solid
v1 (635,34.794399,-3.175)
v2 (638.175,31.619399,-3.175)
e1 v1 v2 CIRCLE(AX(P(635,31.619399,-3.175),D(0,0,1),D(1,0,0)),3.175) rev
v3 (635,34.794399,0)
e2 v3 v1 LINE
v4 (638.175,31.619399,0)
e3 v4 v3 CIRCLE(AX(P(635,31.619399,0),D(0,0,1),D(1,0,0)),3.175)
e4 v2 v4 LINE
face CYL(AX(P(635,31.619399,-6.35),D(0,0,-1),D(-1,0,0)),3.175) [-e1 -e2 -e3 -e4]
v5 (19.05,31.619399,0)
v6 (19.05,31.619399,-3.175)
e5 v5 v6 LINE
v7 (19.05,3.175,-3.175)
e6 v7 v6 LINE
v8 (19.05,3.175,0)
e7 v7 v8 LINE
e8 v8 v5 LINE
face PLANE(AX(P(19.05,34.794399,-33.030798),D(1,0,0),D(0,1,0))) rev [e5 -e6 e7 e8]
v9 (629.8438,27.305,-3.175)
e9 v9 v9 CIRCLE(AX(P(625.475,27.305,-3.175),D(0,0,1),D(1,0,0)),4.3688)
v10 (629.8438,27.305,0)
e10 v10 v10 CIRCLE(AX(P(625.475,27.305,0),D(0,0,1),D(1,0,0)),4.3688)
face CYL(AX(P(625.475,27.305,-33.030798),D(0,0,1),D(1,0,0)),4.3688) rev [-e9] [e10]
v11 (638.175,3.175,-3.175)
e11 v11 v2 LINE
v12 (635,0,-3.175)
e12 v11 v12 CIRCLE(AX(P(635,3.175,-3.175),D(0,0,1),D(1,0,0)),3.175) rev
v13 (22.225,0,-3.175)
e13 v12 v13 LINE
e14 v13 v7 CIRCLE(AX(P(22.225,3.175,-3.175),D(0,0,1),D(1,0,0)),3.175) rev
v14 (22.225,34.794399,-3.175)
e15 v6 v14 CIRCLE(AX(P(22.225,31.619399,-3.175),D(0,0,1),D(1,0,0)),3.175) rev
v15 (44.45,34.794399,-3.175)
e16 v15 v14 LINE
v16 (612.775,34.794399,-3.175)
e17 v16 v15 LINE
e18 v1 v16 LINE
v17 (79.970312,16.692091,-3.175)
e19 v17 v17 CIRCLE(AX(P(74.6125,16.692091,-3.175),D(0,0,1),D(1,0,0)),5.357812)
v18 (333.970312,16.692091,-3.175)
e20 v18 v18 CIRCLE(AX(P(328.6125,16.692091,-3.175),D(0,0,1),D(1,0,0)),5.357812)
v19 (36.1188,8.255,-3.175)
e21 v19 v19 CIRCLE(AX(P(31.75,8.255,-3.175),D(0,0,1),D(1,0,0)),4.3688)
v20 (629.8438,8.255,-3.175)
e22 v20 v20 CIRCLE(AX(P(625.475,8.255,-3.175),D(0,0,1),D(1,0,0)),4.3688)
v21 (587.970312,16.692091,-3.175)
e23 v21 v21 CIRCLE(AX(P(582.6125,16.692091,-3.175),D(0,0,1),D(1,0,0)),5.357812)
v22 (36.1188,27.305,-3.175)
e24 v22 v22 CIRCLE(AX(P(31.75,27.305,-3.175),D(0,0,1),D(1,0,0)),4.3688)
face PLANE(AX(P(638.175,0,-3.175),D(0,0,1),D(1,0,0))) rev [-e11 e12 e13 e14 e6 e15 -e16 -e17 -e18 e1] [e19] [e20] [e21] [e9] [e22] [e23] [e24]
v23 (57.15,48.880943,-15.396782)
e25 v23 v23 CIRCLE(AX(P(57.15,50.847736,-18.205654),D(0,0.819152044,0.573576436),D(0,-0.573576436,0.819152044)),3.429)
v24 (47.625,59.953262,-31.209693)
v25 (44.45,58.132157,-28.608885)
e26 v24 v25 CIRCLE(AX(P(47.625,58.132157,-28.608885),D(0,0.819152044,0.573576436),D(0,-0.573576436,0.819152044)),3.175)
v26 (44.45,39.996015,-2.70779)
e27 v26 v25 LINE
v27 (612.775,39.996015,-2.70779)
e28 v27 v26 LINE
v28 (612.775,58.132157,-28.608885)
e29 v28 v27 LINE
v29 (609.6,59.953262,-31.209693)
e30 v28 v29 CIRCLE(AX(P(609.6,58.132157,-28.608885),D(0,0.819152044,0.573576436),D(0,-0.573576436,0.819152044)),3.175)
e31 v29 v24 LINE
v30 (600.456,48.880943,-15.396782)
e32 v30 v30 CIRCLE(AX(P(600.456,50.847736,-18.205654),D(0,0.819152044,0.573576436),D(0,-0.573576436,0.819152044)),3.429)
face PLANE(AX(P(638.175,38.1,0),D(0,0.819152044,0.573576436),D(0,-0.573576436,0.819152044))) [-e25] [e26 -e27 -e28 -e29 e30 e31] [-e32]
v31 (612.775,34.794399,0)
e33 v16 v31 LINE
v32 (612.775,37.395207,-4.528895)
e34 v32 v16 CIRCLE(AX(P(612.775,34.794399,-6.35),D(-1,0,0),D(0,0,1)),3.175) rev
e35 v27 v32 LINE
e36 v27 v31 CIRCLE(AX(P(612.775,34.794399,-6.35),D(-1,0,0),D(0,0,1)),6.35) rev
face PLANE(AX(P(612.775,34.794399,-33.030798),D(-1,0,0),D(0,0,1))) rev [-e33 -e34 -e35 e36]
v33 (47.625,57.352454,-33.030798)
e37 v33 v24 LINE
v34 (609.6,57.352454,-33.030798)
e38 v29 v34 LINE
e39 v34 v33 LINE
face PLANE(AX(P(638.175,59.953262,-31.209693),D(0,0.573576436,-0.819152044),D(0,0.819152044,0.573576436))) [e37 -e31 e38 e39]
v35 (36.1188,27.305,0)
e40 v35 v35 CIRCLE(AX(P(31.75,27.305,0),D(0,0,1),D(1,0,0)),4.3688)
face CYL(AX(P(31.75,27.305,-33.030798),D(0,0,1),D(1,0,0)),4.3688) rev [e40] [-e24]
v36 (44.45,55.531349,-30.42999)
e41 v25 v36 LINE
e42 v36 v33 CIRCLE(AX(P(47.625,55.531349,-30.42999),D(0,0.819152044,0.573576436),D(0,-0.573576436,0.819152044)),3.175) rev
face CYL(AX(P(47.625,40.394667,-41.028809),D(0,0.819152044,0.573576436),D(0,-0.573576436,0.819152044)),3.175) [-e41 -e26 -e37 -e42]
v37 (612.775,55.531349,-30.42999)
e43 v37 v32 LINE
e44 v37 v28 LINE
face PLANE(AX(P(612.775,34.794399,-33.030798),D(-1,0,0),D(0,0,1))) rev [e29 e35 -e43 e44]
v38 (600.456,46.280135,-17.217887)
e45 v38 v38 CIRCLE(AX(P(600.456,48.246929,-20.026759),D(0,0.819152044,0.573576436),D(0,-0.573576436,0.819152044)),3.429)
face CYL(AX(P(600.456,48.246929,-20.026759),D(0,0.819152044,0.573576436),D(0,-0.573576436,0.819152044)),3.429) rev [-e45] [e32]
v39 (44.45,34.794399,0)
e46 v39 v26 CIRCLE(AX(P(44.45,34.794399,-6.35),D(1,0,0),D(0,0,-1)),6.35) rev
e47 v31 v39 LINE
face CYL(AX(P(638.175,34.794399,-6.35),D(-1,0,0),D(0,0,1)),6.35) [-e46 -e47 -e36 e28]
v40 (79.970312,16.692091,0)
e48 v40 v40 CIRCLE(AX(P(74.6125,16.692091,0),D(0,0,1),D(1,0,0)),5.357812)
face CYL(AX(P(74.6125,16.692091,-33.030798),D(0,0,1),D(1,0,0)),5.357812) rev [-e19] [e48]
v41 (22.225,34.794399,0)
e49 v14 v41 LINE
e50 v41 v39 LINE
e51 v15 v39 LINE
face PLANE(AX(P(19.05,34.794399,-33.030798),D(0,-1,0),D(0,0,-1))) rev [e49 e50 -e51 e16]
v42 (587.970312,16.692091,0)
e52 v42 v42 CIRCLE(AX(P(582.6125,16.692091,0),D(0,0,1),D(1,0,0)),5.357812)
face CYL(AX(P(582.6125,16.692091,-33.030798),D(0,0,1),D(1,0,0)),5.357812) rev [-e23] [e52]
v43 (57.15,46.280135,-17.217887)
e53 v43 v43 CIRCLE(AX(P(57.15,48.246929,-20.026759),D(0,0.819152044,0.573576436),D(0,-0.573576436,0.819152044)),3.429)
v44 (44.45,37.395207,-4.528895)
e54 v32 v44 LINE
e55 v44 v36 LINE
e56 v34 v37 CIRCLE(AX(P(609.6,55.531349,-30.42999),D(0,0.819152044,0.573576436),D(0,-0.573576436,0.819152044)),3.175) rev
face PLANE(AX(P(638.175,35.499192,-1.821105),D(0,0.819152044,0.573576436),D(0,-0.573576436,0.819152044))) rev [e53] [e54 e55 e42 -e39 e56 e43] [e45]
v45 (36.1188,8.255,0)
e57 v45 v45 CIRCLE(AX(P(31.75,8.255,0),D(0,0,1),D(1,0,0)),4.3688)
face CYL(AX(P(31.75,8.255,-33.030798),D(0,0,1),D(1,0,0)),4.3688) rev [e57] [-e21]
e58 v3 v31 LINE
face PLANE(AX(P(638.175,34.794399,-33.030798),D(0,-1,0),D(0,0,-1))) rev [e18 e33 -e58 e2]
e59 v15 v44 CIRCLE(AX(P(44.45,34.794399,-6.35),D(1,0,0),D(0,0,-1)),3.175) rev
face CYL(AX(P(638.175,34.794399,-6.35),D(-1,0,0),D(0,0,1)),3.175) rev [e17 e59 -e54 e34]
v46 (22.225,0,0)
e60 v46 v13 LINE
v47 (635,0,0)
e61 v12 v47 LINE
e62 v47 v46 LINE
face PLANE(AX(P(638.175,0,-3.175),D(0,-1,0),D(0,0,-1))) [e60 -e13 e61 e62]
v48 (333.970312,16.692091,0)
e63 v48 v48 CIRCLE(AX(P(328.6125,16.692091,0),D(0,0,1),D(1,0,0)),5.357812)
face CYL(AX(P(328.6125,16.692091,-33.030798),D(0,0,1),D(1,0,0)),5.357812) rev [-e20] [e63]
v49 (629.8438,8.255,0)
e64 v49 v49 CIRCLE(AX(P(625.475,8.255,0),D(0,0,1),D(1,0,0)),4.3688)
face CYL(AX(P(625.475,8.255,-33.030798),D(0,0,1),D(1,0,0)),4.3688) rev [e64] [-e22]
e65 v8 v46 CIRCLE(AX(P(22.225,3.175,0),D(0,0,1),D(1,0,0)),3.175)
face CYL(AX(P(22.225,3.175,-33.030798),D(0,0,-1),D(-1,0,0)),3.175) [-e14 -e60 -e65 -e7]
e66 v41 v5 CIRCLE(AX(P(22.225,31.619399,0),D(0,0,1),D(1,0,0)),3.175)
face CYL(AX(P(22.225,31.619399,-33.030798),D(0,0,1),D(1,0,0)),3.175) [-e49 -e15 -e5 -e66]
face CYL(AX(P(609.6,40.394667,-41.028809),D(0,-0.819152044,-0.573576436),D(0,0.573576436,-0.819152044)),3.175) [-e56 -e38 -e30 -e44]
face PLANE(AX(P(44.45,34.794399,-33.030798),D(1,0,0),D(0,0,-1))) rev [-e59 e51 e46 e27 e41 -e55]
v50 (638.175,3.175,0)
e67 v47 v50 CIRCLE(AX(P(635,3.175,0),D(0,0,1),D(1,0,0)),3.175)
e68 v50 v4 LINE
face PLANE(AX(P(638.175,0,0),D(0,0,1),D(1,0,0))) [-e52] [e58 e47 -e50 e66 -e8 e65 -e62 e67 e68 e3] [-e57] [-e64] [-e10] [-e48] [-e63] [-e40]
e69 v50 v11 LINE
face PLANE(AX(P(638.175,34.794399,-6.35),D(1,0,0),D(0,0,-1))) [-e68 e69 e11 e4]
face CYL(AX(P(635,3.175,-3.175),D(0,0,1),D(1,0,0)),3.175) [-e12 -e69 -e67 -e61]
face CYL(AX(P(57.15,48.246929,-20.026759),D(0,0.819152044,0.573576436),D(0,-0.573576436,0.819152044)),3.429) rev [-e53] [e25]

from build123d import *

# Parameters (mm, degrees)
BASE_FLANGE1_DEPTH = 638.175
SKETCH6_R          = 4.3688
SKETCH6_R_2        = 5.3578125
SKETCH6_W          = 25.4
SKETCH6_H          = 25.158862996
CUT_EXTRUDE1_DEPTH = 642.835460144
SKETCH8_R          = 3.429
CUT_EXTRUDE2_DEPTH = 3.175
FILLET1_R          = 3.175


# Sheet-metal steps are written as plain solids
with BuildPart() as part:
    # Sketch1 → Base-Flange1 (new body)
    with BuildSketch(Plane(origin=(0, 0, 0), x_dir=(0, 0, -1), z_dir=(1, 0, 0))):
        with BuildLine():
            Line((0, 0), (0, 34.794399229))
            ThreePointArc((0, 34.794399229), (0.717481209, 37.726502923), (2.707789629, 39.99601471))
            Line((2.707789629, 39.99601471), (31.209692887, 59.953262225))
            Line((31.209692887, 59.953262225), (33.030798073, 57.352454484))
            Line((33.030798073, 57.352454484), (4.528894815, 37.39520697))
            ThreePointArc((4.528894815, 37.39520697), (3.533740605, 36.260451076), (3.175, 34.794399229))
            Line((3.175, 34.794399229), (3.175, 0))
            Line((3.175, 0), (0, 0))
        make_face()
    extrude(amount=BASE_FLANGE1_DEPTH)

    # Sketch6 → Cut-Extrude1 (cut, through all)
    with BuildSketch(Plane.XY):
        with Locations((31.75, 27.305)):
            Circle(SKETCH6_R)
        with Locations((31.75, 8.255)):
            Circle(SKETCH6_R)
        with Locations((625.475, 27.305)):
            Circle(SKETCH6_R)
        with Locations((625.475, 8.255)):
            Circle(SKETCH6_R)
        with Locations((74.6125, 16.69209113)):
            Circle(SKETCH6_R_2)
        with Locations((328.6125, 16.69209113)):
            Circle(SKETCH6_R_2)
        with Locations((582.6125, 16.69209113)):
            Circle(SKETCH6_R_2)
        Polygon((19.05, 34.794399229), (44.45, 34.794399229), (44.45, 59.953262225), (0, 59.953262225), (0, 0), (19.05, 0), align=None)
        with Locations((625.475, 47.373830727)):
            Rectangle(SKETCH6_W, SKETCH6_H)
    extrude(amount=-CUT_EXTRUDE1_DEPTH, mode=Mode.SUBTRACT)

    # Sketch8 → Cut-Extrude2 (cut)
    with BuildSketch(Plane(origin=(0, 25.56548373, 17.901144426), x_dir=(1, 0, 0), z_dir=(0, 0.8191520442889929, 0.5735764363510447))):
        with Locations(Location((57.15, 44.078262225, 0), (0, 0, 270))):
            Circle(SKETCH8_R)
        with Locations(Location((600.456, 44.078262225, 0), (0, 0, 270))):
            Circle(SKETCH8_R)
    extrude(amount=-CUT_EXTRUDE2_DEPTH, mode=Mode.SUBTRACT)

    # Fillet1
    fillet1_edges = [part.edges().sort_by_distance(p)[0] for p in [
        (638.175, 34.794399229, -1.5875),
        (638.175, 0, -1.5875),
        (612.775, 58.652858355, -32.12024548),
        (19.05, 0, -1.5875),
        (44.45, 58.652858355, -32.12024548),
        (19.05, 34.794399229, -1.5875),
    ]]
    fillet(fillet1_edges, radius=FILLET1_R)


solid = part.part
